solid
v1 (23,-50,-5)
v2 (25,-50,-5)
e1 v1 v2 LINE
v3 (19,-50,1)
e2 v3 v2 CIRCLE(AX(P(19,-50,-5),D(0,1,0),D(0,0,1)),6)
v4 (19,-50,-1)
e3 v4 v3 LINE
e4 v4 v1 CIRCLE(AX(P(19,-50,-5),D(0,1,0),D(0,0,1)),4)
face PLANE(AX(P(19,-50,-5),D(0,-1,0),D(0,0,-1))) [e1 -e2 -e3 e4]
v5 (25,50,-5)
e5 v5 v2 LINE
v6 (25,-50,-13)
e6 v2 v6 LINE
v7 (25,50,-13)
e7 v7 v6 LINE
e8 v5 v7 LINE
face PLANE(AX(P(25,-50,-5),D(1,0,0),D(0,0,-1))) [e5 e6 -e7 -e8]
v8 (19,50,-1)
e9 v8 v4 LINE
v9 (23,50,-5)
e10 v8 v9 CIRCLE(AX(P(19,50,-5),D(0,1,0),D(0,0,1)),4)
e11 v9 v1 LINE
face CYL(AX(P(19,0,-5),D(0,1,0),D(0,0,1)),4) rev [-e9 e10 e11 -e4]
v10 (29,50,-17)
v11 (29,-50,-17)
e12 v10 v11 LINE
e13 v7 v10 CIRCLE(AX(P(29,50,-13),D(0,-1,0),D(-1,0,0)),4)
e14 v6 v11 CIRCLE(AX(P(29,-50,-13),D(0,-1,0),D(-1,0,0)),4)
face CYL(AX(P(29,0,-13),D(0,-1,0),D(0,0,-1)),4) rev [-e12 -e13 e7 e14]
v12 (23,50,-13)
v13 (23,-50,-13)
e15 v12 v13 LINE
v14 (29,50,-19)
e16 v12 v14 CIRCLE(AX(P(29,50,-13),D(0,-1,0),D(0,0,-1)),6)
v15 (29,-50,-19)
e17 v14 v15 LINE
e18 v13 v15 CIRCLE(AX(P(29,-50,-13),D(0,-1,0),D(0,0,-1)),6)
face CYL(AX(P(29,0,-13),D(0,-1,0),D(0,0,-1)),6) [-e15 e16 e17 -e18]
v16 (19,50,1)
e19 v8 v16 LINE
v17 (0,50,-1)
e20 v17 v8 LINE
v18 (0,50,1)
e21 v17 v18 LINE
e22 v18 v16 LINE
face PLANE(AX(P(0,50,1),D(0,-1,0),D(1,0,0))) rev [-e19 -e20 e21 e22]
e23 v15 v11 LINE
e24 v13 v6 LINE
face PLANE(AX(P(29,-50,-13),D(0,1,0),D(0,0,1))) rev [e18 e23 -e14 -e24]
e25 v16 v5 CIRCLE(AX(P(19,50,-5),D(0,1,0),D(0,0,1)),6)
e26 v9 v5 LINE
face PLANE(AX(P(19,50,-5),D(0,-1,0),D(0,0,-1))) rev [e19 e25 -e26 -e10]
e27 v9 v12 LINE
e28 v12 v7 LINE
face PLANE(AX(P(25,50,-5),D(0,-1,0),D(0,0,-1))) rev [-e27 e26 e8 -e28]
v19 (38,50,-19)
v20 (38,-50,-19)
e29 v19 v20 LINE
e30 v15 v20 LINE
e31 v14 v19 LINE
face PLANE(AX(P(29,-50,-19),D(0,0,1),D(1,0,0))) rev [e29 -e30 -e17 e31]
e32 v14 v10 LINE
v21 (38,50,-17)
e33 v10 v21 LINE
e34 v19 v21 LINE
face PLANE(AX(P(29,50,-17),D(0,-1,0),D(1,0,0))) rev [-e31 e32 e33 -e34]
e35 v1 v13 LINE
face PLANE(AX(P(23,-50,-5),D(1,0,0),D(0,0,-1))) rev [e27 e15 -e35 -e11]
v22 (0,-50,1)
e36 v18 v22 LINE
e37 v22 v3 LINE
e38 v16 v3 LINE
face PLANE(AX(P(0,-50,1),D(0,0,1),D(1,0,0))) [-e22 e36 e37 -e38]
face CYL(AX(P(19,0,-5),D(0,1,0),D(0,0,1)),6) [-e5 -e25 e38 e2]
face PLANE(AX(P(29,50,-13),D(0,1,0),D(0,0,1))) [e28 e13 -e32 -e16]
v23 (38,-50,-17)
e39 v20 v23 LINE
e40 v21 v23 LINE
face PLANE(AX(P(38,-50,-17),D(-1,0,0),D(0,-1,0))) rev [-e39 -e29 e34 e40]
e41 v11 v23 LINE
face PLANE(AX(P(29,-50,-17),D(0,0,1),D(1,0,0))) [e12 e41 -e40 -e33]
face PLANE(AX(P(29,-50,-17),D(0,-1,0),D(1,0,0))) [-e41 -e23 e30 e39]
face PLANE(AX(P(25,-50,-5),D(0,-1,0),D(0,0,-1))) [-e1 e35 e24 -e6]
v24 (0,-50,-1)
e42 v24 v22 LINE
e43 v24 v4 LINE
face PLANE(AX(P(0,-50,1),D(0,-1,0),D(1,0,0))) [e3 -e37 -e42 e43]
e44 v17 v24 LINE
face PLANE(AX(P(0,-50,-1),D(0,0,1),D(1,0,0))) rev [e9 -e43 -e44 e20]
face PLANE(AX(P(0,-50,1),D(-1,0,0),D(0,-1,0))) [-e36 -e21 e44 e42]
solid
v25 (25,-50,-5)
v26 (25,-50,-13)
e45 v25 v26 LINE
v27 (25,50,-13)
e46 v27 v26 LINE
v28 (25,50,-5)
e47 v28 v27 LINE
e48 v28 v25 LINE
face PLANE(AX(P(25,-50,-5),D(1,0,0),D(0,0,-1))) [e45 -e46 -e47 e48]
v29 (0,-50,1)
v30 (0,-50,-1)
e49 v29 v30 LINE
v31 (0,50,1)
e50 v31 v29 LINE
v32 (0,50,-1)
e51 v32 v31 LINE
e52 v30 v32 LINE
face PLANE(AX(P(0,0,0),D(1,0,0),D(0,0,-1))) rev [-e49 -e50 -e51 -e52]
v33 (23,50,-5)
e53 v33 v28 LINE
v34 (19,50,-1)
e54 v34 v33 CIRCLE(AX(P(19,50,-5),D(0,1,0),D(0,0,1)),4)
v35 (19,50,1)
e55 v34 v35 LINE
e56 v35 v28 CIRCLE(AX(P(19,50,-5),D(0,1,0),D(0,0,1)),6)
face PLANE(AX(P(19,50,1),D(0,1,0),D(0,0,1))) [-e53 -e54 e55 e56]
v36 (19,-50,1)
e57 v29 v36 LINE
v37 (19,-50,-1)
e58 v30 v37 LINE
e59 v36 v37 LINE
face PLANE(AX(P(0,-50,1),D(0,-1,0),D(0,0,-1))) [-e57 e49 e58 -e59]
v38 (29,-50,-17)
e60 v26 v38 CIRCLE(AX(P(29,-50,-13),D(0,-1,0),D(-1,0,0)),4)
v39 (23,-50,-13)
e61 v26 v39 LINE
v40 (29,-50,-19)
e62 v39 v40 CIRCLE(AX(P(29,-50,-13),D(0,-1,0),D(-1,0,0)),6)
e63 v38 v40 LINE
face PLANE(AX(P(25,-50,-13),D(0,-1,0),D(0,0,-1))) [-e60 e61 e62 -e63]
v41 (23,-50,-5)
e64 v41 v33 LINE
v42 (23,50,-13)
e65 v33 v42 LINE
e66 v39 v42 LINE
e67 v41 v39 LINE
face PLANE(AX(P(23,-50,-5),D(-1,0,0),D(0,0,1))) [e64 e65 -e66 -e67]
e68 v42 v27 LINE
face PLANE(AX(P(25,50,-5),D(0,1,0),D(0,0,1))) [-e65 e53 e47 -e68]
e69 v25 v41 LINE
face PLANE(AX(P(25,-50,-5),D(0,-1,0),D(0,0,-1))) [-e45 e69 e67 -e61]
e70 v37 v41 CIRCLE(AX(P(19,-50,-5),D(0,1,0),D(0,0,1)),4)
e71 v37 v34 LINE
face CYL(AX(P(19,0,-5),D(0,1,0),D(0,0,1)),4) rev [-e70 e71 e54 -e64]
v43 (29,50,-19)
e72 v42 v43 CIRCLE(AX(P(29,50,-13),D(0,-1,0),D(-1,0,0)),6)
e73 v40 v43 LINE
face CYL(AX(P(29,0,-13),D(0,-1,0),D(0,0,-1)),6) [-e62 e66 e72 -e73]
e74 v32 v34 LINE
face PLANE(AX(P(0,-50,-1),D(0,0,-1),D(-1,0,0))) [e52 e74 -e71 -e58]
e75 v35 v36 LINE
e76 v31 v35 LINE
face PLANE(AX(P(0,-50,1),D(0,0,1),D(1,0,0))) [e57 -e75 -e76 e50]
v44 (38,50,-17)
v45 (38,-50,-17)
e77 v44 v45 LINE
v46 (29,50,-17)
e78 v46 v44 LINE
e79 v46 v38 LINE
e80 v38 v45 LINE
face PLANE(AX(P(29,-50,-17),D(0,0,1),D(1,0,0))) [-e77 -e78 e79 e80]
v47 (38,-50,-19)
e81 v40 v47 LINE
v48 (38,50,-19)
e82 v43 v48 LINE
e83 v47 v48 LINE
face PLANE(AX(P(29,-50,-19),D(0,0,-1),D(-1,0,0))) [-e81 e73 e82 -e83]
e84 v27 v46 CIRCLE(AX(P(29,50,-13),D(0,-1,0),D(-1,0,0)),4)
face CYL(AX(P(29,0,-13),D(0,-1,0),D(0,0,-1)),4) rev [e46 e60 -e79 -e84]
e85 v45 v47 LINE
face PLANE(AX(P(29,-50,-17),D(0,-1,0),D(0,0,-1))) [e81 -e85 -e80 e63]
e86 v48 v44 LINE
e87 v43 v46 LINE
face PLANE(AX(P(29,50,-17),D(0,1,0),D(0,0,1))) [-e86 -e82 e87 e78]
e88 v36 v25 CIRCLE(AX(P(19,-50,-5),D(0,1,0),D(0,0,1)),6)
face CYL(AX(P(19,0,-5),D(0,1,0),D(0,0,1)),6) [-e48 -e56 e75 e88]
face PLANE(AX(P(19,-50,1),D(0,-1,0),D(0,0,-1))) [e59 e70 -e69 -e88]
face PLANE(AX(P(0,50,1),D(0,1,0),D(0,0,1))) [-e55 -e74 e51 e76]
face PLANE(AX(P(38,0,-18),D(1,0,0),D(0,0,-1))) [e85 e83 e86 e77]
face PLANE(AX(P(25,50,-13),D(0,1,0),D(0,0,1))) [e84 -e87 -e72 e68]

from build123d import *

# Parameters (mm, degrees)
SKETCH1_W            = 100
SKETCH1_H            = 2
CONVERT_SOLID3_START = -50
CONVERT_SOLID3_DEPTH = 100


# Read off the part's stored shape, not the designer's step: Convert-Solid3
with BuildPart() as part:
    # Sweep1: sweep along a path in Sketch2
    with BuildLine(Plane(origin=(0, 0, 0), x_dir=(1, 0, 0), z_dir=(0, 1, 0))) as sweep1_path:
        Line((0, 0), (19, 0))
        ThreePointArc((19, 0), (22.535533906, 1.464466094), (24, 5))
        Line((24, 5), (24, 13))
        ThreePointArc((24, 13), (25.464466094, 16.535533906), (29, 18))
        Line((29, 18), (38, 18))
    # Sketch1 → Sweep1 (sweep)
    with BuildSketch(Plane.YZ):
        Rectangle(SKETCH1_W, SKETCH1_H)
    sweep(path=sweep1_path.line)


with BuildPart() as body_2:
    # Convert-Solid3 outline → Convert-Solid3 (new body)
    with BuildSketch(Plane(origin=(0, 0, 0), x_dir=(1, 0, 0), z_dir=(0, 1, 0)).offset(CONVERT_SOLID3_START)):
        with BuildLine():
            Line((0, 1), (0, -1))
            Line((0, -1), (19, -1))
            ThreePointArc((19, -1), (23.242640687, 0.757359313), (25, 5))
            Line((25, 5), (25, 13))
            ThreePointArc((25, 13), (26.171572875, 15.828427125), (29, 17))
            Line((29, 17), (38, 17))
            Line((38, 17), (38, 19))
            Line((38, 19), (29, 19))
            ThreePointArc((29, 19), (24.757359313, 17.242640687), (23, 13))
            Line((23, 13), (23, 5))
            ThreePointArc((23, 5), (21.828427125, 2.171572875), (19, 1))
            Line((19, 1), (0, 1))
        make_face()
    extrude(amount=CONVERT_SOLID3_DEPTH)


solid = Compound([part.part, body_2.part])
